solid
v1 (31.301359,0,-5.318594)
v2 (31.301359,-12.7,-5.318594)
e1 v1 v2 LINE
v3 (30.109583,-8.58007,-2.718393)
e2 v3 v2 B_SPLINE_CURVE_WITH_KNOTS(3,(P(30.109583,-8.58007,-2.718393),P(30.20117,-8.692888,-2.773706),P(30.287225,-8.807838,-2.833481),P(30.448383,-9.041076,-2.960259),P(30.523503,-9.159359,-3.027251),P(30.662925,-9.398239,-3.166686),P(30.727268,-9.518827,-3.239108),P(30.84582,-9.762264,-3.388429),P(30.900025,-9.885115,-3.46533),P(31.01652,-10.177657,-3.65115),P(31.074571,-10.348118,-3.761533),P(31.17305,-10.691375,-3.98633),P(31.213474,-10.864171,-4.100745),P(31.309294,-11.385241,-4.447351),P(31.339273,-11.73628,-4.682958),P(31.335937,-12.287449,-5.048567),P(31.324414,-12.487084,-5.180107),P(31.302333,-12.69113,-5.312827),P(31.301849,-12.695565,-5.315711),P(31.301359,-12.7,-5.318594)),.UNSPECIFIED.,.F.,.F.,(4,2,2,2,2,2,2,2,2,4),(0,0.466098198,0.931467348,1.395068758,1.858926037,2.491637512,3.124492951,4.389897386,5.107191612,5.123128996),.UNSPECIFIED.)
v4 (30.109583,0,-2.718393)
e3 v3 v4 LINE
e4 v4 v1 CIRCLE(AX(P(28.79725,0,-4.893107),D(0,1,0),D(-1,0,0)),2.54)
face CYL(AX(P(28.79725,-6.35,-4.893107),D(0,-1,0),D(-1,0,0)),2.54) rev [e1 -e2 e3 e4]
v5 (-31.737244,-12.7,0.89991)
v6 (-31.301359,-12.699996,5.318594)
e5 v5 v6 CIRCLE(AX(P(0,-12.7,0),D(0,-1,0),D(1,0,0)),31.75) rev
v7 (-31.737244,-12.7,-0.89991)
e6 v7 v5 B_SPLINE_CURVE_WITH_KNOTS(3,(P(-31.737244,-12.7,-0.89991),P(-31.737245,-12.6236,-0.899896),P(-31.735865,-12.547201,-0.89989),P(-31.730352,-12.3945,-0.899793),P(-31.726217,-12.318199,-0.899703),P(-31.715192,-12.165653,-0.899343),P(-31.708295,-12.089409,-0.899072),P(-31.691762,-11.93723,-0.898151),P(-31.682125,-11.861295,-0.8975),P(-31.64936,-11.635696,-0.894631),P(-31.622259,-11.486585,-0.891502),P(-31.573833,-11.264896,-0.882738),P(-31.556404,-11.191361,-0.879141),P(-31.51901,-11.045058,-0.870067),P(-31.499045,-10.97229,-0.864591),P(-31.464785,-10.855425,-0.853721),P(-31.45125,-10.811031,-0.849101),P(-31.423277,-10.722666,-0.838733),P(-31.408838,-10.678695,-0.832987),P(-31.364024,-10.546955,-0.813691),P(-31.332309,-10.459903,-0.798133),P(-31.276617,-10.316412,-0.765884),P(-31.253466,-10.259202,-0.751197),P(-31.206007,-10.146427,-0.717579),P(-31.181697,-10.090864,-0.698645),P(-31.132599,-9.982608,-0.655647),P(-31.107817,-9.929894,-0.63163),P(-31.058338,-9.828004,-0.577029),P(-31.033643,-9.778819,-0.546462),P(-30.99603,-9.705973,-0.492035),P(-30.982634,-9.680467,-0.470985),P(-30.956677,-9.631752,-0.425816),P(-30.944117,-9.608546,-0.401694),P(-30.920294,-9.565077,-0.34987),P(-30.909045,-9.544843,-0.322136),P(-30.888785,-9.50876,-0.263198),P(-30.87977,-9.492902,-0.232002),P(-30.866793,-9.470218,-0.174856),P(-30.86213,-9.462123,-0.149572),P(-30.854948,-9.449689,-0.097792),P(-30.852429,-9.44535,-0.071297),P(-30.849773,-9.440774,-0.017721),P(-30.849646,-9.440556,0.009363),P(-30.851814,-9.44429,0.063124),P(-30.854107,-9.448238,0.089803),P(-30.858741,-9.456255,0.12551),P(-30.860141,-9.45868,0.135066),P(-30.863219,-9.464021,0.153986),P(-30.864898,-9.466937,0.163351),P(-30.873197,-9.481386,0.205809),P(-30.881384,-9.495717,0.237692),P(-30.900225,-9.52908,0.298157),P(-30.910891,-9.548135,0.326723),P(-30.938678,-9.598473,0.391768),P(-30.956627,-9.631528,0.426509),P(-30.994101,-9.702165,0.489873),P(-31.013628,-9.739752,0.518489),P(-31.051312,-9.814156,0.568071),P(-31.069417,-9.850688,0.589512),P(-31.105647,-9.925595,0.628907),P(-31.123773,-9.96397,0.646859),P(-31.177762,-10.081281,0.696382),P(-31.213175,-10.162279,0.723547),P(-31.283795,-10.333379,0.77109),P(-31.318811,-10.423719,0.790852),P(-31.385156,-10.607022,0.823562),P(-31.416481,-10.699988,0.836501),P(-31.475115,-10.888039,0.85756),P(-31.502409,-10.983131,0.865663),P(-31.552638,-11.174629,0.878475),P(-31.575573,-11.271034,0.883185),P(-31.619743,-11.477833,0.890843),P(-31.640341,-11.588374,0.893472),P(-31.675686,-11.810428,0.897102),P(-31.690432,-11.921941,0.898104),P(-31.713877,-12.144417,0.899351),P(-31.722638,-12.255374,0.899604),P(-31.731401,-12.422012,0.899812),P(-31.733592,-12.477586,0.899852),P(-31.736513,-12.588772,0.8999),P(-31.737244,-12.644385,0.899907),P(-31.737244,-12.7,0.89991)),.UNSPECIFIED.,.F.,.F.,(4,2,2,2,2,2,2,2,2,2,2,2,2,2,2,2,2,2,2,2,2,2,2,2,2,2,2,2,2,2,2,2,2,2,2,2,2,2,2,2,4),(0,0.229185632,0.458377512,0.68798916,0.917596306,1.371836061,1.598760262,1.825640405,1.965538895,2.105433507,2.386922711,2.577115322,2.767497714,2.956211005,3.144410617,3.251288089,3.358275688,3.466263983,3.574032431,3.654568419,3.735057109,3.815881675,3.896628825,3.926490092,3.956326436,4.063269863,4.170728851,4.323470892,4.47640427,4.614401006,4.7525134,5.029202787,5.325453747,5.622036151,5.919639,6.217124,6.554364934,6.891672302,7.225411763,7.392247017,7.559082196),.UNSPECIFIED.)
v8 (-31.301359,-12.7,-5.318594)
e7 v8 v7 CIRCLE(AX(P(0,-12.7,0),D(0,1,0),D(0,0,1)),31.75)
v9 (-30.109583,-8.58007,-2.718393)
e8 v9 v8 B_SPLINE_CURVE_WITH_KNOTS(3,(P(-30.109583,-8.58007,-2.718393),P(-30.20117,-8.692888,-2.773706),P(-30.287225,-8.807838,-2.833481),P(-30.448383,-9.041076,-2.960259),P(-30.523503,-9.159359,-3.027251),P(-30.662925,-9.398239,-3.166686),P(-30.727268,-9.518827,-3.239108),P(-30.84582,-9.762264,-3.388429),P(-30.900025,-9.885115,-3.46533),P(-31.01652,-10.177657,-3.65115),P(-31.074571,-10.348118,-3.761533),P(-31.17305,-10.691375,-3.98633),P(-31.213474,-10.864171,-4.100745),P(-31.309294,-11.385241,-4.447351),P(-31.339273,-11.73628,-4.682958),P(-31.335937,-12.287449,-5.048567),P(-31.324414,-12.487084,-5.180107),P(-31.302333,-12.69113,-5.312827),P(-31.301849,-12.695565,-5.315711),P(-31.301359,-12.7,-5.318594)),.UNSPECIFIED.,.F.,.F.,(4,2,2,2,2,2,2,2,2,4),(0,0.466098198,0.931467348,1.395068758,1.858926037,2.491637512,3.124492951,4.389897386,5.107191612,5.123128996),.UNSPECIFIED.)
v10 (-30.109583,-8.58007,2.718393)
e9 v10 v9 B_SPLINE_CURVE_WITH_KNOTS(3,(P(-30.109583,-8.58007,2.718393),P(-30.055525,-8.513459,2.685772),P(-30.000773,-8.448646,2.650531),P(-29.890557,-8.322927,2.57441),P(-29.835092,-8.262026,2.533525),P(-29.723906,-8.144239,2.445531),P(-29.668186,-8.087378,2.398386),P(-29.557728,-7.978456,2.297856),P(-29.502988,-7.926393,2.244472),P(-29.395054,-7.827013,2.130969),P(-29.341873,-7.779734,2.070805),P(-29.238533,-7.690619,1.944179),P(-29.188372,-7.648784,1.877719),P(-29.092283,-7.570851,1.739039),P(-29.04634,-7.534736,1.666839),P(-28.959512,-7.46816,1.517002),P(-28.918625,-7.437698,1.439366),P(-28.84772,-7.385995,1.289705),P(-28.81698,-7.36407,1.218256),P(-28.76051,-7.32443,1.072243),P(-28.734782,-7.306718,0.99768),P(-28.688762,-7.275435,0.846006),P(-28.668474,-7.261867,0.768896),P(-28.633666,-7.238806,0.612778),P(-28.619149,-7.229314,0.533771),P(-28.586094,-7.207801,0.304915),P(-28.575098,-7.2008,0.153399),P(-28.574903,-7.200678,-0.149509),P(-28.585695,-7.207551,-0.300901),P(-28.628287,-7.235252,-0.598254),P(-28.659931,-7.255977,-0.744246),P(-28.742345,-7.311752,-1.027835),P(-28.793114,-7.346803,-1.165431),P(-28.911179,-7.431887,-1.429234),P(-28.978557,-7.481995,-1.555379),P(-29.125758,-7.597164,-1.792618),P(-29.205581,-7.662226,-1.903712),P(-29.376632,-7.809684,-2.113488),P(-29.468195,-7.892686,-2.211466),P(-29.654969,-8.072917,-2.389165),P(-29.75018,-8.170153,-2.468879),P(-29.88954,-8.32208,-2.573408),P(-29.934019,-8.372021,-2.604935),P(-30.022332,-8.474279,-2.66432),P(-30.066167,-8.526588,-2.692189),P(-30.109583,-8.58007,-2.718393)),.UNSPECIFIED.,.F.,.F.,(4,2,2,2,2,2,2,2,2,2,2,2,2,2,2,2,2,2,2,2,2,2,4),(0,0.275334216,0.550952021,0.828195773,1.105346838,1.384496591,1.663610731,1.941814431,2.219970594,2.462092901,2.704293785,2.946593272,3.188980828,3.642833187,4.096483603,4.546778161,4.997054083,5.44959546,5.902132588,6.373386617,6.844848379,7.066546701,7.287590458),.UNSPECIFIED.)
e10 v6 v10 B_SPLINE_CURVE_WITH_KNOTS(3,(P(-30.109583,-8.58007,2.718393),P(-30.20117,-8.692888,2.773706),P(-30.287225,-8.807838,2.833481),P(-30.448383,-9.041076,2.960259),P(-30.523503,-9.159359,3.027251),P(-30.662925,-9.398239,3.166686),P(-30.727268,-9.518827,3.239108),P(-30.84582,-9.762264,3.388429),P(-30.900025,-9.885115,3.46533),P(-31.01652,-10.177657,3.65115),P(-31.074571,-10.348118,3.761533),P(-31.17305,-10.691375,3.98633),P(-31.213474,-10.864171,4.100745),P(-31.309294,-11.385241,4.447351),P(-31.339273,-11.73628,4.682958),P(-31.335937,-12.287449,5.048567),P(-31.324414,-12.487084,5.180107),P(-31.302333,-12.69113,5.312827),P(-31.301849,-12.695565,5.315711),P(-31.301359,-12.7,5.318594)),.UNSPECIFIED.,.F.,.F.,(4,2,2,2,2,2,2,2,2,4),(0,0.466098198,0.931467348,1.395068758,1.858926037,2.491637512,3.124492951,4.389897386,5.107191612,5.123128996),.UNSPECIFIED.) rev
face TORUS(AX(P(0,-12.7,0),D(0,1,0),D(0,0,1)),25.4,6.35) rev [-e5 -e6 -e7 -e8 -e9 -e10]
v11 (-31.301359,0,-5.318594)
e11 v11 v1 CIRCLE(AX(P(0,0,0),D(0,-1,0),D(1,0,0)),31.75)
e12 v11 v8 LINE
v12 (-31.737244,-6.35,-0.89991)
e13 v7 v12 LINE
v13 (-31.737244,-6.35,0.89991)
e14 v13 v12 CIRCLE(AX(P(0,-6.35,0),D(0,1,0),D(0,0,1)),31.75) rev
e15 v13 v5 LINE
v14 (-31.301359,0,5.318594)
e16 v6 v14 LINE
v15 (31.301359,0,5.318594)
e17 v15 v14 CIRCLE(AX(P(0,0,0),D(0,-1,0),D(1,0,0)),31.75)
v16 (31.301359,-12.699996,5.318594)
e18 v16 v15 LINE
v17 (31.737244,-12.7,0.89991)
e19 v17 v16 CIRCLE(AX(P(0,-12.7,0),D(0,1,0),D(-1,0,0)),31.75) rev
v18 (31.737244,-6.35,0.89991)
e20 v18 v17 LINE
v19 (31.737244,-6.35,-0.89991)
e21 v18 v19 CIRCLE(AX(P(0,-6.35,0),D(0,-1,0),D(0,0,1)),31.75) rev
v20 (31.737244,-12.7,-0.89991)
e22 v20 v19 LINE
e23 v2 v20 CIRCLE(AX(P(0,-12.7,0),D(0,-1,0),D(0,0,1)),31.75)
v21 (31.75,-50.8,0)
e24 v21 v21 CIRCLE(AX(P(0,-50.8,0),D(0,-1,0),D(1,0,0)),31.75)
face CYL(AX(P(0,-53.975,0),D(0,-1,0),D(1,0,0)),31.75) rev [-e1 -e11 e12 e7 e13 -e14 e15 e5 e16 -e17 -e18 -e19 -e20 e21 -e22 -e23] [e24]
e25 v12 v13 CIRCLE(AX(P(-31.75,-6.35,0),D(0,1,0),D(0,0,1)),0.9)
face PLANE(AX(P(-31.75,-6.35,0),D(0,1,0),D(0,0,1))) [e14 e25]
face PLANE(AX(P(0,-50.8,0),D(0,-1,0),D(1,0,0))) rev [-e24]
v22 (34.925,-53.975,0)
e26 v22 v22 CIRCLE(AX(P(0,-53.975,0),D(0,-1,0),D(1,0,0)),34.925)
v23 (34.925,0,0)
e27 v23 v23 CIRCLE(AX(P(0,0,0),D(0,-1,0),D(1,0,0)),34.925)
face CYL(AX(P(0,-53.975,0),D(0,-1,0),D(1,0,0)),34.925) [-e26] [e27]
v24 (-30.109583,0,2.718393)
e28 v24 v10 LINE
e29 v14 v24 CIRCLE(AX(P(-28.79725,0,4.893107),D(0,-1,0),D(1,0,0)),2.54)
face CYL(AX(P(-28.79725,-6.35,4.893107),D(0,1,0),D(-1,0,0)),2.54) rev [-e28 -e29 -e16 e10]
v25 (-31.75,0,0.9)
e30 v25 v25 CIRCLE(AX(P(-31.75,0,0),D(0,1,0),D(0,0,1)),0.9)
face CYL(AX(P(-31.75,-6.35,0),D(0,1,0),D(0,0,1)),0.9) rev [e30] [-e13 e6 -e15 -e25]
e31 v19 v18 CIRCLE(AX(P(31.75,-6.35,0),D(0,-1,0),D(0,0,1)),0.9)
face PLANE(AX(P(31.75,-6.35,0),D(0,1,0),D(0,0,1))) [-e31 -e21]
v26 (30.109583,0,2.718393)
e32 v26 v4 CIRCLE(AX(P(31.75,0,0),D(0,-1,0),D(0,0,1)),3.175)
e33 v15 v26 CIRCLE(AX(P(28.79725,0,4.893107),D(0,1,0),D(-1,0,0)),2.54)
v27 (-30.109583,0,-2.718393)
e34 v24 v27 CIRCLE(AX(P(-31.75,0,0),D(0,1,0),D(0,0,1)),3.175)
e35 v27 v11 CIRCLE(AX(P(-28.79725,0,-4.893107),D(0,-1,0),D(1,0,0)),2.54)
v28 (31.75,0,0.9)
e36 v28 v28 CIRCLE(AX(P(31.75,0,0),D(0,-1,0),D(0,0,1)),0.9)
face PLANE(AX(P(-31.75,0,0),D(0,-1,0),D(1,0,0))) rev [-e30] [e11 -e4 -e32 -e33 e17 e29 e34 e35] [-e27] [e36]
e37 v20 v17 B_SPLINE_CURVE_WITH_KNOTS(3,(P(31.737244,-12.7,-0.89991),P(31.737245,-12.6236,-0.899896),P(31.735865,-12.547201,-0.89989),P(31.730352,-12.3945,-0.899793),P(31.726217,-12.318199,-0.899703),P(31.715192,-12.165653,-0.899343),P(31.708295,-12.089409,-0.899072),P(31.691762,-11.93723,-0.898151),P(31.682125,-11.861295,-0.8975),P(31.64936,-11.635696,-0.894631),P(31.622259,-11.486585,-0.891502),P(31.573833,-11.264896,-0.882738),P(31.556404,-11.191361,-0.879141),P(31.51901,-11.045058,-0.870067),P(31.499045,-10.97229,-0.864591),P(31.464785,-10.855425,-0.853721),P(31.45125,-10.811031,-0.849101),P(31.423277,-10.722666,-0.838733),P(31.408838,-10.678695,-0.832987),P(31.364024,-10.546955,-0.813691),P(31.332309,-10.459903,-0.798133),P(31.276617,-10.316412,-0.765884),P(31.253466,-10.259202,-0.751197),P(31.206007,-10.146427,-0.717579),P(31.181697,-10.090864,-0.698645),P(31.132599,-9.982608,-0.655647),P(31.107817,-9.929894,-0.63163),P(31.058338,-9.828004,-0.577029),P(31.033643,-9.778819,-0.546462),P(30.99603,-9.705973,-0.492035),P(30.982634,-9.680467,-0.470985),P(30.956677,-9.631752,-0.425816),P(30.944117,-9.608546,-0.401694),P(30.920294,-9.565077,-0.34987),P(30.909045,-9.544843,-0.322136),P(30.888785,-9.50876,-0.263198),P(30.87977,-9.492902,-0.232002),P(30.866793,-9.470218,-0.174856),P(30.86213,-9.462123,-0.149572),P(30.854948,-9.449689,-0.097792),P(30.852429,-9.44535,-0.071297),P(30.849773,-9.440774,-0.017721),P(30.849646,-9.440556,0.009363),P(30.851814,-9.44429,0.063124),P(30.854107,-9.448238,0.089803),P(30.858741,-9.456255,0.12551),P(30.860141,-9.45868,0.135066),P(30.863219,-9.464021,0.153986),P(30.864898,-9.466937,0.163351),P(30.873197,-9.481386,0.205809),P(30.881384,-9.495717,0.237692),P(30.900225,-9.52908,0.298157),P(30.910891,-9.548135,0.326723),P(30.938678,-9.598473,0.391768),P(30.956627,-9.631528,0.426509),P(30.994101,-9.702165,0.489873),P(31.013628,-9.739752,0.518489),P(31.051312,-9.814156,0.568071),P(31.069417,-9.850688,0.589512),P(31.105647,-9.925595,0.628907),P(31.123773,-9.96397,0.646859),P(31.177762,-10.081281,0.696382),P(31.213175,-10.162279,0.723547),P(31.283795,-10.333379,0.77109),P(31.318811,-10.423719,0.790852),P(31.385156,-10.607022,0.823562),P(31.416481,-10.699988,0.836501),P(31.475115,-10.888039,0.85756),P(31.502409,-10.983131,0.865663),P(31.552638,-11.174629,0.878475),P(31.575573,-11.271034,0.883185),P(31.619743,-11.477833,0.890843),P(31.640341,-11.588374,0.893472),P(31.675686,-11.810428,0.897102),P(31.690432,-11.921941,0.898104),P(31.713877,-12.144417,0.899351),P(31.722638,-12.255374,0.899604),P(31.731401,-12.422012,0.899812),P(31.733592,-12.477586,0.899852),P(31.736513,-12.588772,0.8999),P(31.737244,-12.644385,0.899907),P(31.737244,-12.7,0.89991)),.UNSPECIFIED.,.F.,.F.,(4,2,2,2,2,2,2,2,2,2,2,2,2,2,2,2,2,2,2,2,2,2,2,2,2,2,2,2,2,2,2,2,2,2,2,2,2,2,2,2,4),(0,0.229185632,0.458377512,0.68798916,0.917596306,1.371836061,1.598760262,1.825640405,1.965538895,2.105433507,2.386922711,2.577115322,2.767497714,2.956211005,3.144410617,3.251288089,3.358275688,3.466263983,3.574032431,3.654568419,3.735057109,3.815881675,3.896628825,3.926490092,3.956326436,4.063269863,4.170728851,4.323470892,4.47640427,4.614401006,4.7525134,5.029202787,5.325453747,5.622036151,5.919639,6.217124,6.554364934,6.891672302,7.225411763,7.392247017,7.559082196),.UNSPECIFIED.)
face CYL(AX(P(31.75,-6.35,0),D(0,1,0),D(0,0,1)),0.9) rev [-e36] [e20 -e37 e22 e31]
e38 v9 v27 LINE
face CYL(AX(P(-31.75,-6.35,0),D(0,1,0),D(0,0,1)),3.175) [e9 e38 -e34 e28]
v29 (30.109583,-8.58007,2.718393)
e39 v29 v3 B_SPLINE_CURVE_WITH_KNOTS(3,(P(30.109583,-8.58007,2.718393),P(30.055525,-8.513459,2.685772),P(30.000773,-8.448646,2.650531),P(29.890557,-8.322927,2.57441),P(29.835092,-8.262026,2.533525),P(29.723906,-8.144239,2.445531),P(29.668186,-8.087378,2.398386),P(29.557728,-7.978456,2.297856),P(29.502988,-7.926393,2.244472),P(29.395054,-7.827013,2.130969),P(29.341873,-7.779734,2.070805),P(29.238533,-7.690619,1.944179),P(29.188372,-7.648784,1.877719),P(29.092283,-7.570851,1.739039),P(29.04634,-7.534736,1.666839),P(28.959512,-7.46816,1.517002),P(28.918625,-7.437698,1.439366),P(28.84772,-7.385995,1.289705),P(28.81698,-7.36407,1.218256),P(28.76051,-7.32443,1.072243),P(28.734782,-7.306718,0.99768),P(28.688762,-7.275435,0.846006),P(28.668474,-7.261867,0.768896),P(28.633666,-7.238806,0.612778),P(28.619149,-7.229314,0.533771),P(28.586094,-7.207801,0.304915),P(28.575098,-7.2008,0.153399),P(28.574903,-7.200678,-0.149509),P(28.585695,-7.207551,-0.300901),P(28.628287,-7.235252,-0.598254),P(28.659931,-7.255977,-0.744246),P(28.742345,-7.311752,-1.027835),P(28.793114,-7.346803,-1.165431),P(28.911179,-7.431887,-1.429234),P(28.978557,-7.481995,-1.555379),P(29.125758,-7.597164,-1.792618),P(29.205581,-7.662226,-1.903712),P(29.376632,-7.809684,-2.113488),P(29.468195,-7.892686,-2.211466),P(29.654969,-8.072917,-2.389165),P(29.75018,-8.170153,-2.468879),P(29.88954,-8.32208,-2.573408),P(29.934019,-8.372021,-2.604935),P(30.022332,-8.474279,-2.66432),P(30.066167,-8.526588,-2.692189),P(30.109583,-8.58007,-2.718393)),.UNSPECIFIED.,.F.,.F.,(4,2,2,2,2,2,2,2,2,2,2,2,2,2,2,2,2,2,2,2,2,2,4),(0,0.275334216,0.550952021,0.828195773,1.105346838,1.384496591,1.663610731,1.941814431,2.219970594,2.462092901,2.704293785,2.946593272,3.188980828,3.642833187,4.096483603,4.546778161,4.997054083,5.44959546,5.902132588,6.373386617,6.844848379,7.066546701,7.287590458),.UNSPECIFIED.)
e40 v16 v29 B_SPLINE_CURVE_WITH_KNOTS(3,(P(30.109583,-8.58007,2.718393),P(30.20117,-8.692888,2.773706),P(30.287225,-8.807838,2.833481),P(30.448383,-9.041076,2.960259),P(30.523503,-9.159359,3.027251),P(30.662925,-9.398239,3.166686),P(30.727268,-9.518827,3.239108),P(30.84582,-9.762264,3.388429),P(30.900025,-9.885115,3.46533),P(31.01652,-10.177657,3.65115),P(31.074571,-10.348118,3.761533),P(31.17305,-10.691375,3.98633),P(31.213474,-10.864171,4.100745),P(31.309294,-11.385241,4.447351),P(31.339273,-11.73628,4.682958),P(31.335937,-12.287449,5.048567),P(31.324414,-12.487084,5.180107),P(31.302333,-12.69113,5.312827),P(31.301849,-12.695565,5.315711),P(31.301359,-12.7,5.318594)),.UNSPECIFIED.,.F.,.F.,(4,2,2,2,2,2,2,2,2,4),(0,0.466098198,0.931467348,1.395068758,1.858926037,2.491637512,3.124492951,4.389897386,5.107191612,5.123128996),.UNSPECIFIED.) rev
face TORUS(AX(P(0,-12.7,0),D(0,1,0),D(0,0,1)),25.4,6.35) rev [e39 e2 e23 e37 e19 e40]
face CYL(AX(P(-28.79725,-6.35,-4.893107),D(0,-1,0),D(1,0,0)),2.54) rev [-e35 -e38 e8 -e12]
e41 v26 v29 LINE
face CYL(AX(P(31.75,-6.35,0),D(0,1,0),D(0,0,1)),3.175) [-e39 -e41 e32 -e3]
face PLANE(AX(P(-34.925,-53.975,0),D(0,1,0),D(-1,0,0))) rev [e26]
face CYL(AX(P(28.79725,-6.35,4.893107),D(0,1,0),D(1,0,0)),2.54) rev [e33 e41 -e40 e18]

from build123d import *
from build123d.topology import SkipClean

# Parameters (mm, degrees)
SKETCH2_R               = 3.175
SKETCH2_R_2             = 0.9
BOSS_EXTRUDE1_DEPTH     = 6.35
CUT_EXTRUDE1_DEPTH      = 6.35
FILLET1_R               = 2.54
FILLET2_START           = -7.200738553
FILLET2_DEPTH           = 0.850738553
FILLET2_START_2         = -12.7000001
FILLET2_2_DEPTH         = 5.499261547
CUT_EXTRUDE2_DEPTH      = 74.162913344
CUT_EXTRUDE2_DEPTH_BACK = 74.162913344
SKETCH4_W               = 34.925
SKETCH4_H               = 69.85


with BuildPart() as part:
    # Sketch1 → Revolve1 (revolve)
    with BuildSketch(Plane.XY, mode=Mode.PRIVATE) as revolve1_sk:
        Polygon((0, -50.8), (-31.75, -50.8), (-31.75, 0), (-34.925, 0), (-34.925, -53.975), (0, -53.975), align=None)
    revolve(revolve1_sk.sketch.rotate(Axis((0, -53.975, 0), (0, 1, 0)), 180), axis=Axis((0, -53.975, 0), (0, 1, 0)))

    # Sketch2 → Boss-Extrude1 (add)
    with BuildSketch(Plane(origin=(0, 0, 0), x_dir=(1, 0, 0), z_dir=(0, 1, 0))):
        with Locations((-31.75, 0)):
            Circle(SKETCH2_R)
        with Locations((-31.75, 0)):
            Circle(SKETCH2_R_2, mode=Mode.SUBTRACT)
    extrude(amount=-BOSS_EXTRUDE1_DEPTH)

    # Sketch3 → Cut-Extrude1 (cut)
    with BuildSketch(Plane(origin=(0, 0, 0), x_dir=(1, 0, 0), z_dir=(0, 1, 0))):
        with BuildLine():
            ThreePointArc((-31.737244094, -0.899909599), (-30.85, 0), (-31.737244094, 0.899909599))
            ThreePointArc((-31.737244094, 0.899909599), (-32.65, 0), (-31.737244094, -0.899909599))
        make_face()
    extrude(amount=-CUT_EXTRUDE1_DEPTH, mode=Mode.SUBTRACT)

    # Fillet1
    fillet1_edges = [part.edges().sort_by_distance(p)[0] for p in [
        (-31.59125, -3.175, -3.171028766),
        (-31.59125, -3.175, 3.171028766),
    ]]
    fillet(fillet1_edges, radius=FILLET1_R)

    # Fillet2: read off the stored shape, not the designer's step
    # Fillet2 outline → Fillet2 (add)
    with BuildSketch(Plane(origin=(0, 0, 0), x_dir=(1, 0, 0), z_dir=(0, 1, 0)).offset(FILLET2_START)):
        with BuildLine():
            ThreePointArc((-31.737244094, 0.899909599), (-30.85, 0), (-31.737244094, -0.899909599))
            ThreePointArc((-31.737244094, -0.899909599), (-31.59663833, -3.116880855), (-31.301358696, -5.318594157))
            ThreePointArc((-31.301358696, -5.318594157), (-31.106269167, -3.834791697), (-30.109583333, -2.718392569))
            ThreePointArc((-30.109583333, -2.718392569), (-28.575, 0), (-30.109583333, 2.718392569))
            ThreePointArc((-30.109583333, 2.718392569), (-31.106269167, 3.834791697), (-31.301358696, 5.318594157))
            ThreePointArc((-31.301358696, 5.318594157), (-31.59663833, 3.116880855), (-31.737244094, 0.899909599))
        make_face()
    extrude(amount=FILLET2_DEPTH)

    # Fillet2 2 outline → Fillet2 2 (add)
    with BuildSketch(Plane(origin=(0, 0, 0), x_dir=(1, 0, 0), z_dir=(0, 1, 0)).offset(FILLET2_START_2)):
        with BuildLine():
            ThreePointArc((-31.737244094, 0.899909599), (-30.85, 0), (-31.737244094, -0.899909599))
            ThreePointArc((-31.737244094, -0.899909599), (-31.59663833, -3.116880855), (-31.301358695, -5.318594158))
            ThreePointArc((-31.301358695, -5.318594158), (-31.106269167, -3.834791697), (-30.109583333, -2.718392569))
            ThreePointArc((-30.109583333, -2.718392569), (-28.575, 0), (-30.109583333, 2.718392569))
            ThreePointArc((-30.109583333, 2.718392569), (-31.106269167, 3.834791697), (-31.301358696, 5.318594157))
            ThreePointArc((-31.301358696, 5.318594157), (-31.59663833, 3.116880854), (-31.737244094, 0.899909599))
        make_face()
    extrude(amount=FILLET2_2_DEPTH)

    # Fillet2 3 outline → Fillet2 3 (revolve, cut)
    with BuildSketch(Plane.XY):
        with BuildLine():
            Line((28.575, -12.7000001), (31.75, -12.7))
            ThreePointArc((31.75, -12.7), (30.899261314, -9.525), (28.575, -7.200738685))
            Line((28.575, -7.200738685), (28.575, -12.7000001))
        make_face()
    revolve(axis=Axis((0, 0, 0), (0, 1, 0)), mode=Mode.SUBTRACT)

    # Sketch4 → Cut-Extrude2 (cut, two sides: drawn at the far end of the back side and taken through both)
    with BuildSketch(Plane(origin=(0, 0, 0), x_dir=(1, 0, 0), z_dir=(0, 1, 0)).offset(-CUT_EXTRUDE2_DEPTH_BACK)):
        with Locations((17.4625, 0)):
            Rectangle(SKETCH4_W, SKETCH4_H)
    extrude(amount=CUT_EXTRUDE2_DEPTH + CUT_EXTRUDE2_DEPTH_BACK, mode=Mode.SUBTRACT)

    # Mirror1: part across plane


with BuildPart() as part_1:
    with SkipClean():  # the faces are left unmerged after this step: merging them gives an invalid solid
        add(part.part)
        add(part.part.mirror(Plane(origin=(0, -53.975, 34.925), x_dir=(0, 0, 1), z_dir=(-1, 0, 0))))


solid = part_1.part
